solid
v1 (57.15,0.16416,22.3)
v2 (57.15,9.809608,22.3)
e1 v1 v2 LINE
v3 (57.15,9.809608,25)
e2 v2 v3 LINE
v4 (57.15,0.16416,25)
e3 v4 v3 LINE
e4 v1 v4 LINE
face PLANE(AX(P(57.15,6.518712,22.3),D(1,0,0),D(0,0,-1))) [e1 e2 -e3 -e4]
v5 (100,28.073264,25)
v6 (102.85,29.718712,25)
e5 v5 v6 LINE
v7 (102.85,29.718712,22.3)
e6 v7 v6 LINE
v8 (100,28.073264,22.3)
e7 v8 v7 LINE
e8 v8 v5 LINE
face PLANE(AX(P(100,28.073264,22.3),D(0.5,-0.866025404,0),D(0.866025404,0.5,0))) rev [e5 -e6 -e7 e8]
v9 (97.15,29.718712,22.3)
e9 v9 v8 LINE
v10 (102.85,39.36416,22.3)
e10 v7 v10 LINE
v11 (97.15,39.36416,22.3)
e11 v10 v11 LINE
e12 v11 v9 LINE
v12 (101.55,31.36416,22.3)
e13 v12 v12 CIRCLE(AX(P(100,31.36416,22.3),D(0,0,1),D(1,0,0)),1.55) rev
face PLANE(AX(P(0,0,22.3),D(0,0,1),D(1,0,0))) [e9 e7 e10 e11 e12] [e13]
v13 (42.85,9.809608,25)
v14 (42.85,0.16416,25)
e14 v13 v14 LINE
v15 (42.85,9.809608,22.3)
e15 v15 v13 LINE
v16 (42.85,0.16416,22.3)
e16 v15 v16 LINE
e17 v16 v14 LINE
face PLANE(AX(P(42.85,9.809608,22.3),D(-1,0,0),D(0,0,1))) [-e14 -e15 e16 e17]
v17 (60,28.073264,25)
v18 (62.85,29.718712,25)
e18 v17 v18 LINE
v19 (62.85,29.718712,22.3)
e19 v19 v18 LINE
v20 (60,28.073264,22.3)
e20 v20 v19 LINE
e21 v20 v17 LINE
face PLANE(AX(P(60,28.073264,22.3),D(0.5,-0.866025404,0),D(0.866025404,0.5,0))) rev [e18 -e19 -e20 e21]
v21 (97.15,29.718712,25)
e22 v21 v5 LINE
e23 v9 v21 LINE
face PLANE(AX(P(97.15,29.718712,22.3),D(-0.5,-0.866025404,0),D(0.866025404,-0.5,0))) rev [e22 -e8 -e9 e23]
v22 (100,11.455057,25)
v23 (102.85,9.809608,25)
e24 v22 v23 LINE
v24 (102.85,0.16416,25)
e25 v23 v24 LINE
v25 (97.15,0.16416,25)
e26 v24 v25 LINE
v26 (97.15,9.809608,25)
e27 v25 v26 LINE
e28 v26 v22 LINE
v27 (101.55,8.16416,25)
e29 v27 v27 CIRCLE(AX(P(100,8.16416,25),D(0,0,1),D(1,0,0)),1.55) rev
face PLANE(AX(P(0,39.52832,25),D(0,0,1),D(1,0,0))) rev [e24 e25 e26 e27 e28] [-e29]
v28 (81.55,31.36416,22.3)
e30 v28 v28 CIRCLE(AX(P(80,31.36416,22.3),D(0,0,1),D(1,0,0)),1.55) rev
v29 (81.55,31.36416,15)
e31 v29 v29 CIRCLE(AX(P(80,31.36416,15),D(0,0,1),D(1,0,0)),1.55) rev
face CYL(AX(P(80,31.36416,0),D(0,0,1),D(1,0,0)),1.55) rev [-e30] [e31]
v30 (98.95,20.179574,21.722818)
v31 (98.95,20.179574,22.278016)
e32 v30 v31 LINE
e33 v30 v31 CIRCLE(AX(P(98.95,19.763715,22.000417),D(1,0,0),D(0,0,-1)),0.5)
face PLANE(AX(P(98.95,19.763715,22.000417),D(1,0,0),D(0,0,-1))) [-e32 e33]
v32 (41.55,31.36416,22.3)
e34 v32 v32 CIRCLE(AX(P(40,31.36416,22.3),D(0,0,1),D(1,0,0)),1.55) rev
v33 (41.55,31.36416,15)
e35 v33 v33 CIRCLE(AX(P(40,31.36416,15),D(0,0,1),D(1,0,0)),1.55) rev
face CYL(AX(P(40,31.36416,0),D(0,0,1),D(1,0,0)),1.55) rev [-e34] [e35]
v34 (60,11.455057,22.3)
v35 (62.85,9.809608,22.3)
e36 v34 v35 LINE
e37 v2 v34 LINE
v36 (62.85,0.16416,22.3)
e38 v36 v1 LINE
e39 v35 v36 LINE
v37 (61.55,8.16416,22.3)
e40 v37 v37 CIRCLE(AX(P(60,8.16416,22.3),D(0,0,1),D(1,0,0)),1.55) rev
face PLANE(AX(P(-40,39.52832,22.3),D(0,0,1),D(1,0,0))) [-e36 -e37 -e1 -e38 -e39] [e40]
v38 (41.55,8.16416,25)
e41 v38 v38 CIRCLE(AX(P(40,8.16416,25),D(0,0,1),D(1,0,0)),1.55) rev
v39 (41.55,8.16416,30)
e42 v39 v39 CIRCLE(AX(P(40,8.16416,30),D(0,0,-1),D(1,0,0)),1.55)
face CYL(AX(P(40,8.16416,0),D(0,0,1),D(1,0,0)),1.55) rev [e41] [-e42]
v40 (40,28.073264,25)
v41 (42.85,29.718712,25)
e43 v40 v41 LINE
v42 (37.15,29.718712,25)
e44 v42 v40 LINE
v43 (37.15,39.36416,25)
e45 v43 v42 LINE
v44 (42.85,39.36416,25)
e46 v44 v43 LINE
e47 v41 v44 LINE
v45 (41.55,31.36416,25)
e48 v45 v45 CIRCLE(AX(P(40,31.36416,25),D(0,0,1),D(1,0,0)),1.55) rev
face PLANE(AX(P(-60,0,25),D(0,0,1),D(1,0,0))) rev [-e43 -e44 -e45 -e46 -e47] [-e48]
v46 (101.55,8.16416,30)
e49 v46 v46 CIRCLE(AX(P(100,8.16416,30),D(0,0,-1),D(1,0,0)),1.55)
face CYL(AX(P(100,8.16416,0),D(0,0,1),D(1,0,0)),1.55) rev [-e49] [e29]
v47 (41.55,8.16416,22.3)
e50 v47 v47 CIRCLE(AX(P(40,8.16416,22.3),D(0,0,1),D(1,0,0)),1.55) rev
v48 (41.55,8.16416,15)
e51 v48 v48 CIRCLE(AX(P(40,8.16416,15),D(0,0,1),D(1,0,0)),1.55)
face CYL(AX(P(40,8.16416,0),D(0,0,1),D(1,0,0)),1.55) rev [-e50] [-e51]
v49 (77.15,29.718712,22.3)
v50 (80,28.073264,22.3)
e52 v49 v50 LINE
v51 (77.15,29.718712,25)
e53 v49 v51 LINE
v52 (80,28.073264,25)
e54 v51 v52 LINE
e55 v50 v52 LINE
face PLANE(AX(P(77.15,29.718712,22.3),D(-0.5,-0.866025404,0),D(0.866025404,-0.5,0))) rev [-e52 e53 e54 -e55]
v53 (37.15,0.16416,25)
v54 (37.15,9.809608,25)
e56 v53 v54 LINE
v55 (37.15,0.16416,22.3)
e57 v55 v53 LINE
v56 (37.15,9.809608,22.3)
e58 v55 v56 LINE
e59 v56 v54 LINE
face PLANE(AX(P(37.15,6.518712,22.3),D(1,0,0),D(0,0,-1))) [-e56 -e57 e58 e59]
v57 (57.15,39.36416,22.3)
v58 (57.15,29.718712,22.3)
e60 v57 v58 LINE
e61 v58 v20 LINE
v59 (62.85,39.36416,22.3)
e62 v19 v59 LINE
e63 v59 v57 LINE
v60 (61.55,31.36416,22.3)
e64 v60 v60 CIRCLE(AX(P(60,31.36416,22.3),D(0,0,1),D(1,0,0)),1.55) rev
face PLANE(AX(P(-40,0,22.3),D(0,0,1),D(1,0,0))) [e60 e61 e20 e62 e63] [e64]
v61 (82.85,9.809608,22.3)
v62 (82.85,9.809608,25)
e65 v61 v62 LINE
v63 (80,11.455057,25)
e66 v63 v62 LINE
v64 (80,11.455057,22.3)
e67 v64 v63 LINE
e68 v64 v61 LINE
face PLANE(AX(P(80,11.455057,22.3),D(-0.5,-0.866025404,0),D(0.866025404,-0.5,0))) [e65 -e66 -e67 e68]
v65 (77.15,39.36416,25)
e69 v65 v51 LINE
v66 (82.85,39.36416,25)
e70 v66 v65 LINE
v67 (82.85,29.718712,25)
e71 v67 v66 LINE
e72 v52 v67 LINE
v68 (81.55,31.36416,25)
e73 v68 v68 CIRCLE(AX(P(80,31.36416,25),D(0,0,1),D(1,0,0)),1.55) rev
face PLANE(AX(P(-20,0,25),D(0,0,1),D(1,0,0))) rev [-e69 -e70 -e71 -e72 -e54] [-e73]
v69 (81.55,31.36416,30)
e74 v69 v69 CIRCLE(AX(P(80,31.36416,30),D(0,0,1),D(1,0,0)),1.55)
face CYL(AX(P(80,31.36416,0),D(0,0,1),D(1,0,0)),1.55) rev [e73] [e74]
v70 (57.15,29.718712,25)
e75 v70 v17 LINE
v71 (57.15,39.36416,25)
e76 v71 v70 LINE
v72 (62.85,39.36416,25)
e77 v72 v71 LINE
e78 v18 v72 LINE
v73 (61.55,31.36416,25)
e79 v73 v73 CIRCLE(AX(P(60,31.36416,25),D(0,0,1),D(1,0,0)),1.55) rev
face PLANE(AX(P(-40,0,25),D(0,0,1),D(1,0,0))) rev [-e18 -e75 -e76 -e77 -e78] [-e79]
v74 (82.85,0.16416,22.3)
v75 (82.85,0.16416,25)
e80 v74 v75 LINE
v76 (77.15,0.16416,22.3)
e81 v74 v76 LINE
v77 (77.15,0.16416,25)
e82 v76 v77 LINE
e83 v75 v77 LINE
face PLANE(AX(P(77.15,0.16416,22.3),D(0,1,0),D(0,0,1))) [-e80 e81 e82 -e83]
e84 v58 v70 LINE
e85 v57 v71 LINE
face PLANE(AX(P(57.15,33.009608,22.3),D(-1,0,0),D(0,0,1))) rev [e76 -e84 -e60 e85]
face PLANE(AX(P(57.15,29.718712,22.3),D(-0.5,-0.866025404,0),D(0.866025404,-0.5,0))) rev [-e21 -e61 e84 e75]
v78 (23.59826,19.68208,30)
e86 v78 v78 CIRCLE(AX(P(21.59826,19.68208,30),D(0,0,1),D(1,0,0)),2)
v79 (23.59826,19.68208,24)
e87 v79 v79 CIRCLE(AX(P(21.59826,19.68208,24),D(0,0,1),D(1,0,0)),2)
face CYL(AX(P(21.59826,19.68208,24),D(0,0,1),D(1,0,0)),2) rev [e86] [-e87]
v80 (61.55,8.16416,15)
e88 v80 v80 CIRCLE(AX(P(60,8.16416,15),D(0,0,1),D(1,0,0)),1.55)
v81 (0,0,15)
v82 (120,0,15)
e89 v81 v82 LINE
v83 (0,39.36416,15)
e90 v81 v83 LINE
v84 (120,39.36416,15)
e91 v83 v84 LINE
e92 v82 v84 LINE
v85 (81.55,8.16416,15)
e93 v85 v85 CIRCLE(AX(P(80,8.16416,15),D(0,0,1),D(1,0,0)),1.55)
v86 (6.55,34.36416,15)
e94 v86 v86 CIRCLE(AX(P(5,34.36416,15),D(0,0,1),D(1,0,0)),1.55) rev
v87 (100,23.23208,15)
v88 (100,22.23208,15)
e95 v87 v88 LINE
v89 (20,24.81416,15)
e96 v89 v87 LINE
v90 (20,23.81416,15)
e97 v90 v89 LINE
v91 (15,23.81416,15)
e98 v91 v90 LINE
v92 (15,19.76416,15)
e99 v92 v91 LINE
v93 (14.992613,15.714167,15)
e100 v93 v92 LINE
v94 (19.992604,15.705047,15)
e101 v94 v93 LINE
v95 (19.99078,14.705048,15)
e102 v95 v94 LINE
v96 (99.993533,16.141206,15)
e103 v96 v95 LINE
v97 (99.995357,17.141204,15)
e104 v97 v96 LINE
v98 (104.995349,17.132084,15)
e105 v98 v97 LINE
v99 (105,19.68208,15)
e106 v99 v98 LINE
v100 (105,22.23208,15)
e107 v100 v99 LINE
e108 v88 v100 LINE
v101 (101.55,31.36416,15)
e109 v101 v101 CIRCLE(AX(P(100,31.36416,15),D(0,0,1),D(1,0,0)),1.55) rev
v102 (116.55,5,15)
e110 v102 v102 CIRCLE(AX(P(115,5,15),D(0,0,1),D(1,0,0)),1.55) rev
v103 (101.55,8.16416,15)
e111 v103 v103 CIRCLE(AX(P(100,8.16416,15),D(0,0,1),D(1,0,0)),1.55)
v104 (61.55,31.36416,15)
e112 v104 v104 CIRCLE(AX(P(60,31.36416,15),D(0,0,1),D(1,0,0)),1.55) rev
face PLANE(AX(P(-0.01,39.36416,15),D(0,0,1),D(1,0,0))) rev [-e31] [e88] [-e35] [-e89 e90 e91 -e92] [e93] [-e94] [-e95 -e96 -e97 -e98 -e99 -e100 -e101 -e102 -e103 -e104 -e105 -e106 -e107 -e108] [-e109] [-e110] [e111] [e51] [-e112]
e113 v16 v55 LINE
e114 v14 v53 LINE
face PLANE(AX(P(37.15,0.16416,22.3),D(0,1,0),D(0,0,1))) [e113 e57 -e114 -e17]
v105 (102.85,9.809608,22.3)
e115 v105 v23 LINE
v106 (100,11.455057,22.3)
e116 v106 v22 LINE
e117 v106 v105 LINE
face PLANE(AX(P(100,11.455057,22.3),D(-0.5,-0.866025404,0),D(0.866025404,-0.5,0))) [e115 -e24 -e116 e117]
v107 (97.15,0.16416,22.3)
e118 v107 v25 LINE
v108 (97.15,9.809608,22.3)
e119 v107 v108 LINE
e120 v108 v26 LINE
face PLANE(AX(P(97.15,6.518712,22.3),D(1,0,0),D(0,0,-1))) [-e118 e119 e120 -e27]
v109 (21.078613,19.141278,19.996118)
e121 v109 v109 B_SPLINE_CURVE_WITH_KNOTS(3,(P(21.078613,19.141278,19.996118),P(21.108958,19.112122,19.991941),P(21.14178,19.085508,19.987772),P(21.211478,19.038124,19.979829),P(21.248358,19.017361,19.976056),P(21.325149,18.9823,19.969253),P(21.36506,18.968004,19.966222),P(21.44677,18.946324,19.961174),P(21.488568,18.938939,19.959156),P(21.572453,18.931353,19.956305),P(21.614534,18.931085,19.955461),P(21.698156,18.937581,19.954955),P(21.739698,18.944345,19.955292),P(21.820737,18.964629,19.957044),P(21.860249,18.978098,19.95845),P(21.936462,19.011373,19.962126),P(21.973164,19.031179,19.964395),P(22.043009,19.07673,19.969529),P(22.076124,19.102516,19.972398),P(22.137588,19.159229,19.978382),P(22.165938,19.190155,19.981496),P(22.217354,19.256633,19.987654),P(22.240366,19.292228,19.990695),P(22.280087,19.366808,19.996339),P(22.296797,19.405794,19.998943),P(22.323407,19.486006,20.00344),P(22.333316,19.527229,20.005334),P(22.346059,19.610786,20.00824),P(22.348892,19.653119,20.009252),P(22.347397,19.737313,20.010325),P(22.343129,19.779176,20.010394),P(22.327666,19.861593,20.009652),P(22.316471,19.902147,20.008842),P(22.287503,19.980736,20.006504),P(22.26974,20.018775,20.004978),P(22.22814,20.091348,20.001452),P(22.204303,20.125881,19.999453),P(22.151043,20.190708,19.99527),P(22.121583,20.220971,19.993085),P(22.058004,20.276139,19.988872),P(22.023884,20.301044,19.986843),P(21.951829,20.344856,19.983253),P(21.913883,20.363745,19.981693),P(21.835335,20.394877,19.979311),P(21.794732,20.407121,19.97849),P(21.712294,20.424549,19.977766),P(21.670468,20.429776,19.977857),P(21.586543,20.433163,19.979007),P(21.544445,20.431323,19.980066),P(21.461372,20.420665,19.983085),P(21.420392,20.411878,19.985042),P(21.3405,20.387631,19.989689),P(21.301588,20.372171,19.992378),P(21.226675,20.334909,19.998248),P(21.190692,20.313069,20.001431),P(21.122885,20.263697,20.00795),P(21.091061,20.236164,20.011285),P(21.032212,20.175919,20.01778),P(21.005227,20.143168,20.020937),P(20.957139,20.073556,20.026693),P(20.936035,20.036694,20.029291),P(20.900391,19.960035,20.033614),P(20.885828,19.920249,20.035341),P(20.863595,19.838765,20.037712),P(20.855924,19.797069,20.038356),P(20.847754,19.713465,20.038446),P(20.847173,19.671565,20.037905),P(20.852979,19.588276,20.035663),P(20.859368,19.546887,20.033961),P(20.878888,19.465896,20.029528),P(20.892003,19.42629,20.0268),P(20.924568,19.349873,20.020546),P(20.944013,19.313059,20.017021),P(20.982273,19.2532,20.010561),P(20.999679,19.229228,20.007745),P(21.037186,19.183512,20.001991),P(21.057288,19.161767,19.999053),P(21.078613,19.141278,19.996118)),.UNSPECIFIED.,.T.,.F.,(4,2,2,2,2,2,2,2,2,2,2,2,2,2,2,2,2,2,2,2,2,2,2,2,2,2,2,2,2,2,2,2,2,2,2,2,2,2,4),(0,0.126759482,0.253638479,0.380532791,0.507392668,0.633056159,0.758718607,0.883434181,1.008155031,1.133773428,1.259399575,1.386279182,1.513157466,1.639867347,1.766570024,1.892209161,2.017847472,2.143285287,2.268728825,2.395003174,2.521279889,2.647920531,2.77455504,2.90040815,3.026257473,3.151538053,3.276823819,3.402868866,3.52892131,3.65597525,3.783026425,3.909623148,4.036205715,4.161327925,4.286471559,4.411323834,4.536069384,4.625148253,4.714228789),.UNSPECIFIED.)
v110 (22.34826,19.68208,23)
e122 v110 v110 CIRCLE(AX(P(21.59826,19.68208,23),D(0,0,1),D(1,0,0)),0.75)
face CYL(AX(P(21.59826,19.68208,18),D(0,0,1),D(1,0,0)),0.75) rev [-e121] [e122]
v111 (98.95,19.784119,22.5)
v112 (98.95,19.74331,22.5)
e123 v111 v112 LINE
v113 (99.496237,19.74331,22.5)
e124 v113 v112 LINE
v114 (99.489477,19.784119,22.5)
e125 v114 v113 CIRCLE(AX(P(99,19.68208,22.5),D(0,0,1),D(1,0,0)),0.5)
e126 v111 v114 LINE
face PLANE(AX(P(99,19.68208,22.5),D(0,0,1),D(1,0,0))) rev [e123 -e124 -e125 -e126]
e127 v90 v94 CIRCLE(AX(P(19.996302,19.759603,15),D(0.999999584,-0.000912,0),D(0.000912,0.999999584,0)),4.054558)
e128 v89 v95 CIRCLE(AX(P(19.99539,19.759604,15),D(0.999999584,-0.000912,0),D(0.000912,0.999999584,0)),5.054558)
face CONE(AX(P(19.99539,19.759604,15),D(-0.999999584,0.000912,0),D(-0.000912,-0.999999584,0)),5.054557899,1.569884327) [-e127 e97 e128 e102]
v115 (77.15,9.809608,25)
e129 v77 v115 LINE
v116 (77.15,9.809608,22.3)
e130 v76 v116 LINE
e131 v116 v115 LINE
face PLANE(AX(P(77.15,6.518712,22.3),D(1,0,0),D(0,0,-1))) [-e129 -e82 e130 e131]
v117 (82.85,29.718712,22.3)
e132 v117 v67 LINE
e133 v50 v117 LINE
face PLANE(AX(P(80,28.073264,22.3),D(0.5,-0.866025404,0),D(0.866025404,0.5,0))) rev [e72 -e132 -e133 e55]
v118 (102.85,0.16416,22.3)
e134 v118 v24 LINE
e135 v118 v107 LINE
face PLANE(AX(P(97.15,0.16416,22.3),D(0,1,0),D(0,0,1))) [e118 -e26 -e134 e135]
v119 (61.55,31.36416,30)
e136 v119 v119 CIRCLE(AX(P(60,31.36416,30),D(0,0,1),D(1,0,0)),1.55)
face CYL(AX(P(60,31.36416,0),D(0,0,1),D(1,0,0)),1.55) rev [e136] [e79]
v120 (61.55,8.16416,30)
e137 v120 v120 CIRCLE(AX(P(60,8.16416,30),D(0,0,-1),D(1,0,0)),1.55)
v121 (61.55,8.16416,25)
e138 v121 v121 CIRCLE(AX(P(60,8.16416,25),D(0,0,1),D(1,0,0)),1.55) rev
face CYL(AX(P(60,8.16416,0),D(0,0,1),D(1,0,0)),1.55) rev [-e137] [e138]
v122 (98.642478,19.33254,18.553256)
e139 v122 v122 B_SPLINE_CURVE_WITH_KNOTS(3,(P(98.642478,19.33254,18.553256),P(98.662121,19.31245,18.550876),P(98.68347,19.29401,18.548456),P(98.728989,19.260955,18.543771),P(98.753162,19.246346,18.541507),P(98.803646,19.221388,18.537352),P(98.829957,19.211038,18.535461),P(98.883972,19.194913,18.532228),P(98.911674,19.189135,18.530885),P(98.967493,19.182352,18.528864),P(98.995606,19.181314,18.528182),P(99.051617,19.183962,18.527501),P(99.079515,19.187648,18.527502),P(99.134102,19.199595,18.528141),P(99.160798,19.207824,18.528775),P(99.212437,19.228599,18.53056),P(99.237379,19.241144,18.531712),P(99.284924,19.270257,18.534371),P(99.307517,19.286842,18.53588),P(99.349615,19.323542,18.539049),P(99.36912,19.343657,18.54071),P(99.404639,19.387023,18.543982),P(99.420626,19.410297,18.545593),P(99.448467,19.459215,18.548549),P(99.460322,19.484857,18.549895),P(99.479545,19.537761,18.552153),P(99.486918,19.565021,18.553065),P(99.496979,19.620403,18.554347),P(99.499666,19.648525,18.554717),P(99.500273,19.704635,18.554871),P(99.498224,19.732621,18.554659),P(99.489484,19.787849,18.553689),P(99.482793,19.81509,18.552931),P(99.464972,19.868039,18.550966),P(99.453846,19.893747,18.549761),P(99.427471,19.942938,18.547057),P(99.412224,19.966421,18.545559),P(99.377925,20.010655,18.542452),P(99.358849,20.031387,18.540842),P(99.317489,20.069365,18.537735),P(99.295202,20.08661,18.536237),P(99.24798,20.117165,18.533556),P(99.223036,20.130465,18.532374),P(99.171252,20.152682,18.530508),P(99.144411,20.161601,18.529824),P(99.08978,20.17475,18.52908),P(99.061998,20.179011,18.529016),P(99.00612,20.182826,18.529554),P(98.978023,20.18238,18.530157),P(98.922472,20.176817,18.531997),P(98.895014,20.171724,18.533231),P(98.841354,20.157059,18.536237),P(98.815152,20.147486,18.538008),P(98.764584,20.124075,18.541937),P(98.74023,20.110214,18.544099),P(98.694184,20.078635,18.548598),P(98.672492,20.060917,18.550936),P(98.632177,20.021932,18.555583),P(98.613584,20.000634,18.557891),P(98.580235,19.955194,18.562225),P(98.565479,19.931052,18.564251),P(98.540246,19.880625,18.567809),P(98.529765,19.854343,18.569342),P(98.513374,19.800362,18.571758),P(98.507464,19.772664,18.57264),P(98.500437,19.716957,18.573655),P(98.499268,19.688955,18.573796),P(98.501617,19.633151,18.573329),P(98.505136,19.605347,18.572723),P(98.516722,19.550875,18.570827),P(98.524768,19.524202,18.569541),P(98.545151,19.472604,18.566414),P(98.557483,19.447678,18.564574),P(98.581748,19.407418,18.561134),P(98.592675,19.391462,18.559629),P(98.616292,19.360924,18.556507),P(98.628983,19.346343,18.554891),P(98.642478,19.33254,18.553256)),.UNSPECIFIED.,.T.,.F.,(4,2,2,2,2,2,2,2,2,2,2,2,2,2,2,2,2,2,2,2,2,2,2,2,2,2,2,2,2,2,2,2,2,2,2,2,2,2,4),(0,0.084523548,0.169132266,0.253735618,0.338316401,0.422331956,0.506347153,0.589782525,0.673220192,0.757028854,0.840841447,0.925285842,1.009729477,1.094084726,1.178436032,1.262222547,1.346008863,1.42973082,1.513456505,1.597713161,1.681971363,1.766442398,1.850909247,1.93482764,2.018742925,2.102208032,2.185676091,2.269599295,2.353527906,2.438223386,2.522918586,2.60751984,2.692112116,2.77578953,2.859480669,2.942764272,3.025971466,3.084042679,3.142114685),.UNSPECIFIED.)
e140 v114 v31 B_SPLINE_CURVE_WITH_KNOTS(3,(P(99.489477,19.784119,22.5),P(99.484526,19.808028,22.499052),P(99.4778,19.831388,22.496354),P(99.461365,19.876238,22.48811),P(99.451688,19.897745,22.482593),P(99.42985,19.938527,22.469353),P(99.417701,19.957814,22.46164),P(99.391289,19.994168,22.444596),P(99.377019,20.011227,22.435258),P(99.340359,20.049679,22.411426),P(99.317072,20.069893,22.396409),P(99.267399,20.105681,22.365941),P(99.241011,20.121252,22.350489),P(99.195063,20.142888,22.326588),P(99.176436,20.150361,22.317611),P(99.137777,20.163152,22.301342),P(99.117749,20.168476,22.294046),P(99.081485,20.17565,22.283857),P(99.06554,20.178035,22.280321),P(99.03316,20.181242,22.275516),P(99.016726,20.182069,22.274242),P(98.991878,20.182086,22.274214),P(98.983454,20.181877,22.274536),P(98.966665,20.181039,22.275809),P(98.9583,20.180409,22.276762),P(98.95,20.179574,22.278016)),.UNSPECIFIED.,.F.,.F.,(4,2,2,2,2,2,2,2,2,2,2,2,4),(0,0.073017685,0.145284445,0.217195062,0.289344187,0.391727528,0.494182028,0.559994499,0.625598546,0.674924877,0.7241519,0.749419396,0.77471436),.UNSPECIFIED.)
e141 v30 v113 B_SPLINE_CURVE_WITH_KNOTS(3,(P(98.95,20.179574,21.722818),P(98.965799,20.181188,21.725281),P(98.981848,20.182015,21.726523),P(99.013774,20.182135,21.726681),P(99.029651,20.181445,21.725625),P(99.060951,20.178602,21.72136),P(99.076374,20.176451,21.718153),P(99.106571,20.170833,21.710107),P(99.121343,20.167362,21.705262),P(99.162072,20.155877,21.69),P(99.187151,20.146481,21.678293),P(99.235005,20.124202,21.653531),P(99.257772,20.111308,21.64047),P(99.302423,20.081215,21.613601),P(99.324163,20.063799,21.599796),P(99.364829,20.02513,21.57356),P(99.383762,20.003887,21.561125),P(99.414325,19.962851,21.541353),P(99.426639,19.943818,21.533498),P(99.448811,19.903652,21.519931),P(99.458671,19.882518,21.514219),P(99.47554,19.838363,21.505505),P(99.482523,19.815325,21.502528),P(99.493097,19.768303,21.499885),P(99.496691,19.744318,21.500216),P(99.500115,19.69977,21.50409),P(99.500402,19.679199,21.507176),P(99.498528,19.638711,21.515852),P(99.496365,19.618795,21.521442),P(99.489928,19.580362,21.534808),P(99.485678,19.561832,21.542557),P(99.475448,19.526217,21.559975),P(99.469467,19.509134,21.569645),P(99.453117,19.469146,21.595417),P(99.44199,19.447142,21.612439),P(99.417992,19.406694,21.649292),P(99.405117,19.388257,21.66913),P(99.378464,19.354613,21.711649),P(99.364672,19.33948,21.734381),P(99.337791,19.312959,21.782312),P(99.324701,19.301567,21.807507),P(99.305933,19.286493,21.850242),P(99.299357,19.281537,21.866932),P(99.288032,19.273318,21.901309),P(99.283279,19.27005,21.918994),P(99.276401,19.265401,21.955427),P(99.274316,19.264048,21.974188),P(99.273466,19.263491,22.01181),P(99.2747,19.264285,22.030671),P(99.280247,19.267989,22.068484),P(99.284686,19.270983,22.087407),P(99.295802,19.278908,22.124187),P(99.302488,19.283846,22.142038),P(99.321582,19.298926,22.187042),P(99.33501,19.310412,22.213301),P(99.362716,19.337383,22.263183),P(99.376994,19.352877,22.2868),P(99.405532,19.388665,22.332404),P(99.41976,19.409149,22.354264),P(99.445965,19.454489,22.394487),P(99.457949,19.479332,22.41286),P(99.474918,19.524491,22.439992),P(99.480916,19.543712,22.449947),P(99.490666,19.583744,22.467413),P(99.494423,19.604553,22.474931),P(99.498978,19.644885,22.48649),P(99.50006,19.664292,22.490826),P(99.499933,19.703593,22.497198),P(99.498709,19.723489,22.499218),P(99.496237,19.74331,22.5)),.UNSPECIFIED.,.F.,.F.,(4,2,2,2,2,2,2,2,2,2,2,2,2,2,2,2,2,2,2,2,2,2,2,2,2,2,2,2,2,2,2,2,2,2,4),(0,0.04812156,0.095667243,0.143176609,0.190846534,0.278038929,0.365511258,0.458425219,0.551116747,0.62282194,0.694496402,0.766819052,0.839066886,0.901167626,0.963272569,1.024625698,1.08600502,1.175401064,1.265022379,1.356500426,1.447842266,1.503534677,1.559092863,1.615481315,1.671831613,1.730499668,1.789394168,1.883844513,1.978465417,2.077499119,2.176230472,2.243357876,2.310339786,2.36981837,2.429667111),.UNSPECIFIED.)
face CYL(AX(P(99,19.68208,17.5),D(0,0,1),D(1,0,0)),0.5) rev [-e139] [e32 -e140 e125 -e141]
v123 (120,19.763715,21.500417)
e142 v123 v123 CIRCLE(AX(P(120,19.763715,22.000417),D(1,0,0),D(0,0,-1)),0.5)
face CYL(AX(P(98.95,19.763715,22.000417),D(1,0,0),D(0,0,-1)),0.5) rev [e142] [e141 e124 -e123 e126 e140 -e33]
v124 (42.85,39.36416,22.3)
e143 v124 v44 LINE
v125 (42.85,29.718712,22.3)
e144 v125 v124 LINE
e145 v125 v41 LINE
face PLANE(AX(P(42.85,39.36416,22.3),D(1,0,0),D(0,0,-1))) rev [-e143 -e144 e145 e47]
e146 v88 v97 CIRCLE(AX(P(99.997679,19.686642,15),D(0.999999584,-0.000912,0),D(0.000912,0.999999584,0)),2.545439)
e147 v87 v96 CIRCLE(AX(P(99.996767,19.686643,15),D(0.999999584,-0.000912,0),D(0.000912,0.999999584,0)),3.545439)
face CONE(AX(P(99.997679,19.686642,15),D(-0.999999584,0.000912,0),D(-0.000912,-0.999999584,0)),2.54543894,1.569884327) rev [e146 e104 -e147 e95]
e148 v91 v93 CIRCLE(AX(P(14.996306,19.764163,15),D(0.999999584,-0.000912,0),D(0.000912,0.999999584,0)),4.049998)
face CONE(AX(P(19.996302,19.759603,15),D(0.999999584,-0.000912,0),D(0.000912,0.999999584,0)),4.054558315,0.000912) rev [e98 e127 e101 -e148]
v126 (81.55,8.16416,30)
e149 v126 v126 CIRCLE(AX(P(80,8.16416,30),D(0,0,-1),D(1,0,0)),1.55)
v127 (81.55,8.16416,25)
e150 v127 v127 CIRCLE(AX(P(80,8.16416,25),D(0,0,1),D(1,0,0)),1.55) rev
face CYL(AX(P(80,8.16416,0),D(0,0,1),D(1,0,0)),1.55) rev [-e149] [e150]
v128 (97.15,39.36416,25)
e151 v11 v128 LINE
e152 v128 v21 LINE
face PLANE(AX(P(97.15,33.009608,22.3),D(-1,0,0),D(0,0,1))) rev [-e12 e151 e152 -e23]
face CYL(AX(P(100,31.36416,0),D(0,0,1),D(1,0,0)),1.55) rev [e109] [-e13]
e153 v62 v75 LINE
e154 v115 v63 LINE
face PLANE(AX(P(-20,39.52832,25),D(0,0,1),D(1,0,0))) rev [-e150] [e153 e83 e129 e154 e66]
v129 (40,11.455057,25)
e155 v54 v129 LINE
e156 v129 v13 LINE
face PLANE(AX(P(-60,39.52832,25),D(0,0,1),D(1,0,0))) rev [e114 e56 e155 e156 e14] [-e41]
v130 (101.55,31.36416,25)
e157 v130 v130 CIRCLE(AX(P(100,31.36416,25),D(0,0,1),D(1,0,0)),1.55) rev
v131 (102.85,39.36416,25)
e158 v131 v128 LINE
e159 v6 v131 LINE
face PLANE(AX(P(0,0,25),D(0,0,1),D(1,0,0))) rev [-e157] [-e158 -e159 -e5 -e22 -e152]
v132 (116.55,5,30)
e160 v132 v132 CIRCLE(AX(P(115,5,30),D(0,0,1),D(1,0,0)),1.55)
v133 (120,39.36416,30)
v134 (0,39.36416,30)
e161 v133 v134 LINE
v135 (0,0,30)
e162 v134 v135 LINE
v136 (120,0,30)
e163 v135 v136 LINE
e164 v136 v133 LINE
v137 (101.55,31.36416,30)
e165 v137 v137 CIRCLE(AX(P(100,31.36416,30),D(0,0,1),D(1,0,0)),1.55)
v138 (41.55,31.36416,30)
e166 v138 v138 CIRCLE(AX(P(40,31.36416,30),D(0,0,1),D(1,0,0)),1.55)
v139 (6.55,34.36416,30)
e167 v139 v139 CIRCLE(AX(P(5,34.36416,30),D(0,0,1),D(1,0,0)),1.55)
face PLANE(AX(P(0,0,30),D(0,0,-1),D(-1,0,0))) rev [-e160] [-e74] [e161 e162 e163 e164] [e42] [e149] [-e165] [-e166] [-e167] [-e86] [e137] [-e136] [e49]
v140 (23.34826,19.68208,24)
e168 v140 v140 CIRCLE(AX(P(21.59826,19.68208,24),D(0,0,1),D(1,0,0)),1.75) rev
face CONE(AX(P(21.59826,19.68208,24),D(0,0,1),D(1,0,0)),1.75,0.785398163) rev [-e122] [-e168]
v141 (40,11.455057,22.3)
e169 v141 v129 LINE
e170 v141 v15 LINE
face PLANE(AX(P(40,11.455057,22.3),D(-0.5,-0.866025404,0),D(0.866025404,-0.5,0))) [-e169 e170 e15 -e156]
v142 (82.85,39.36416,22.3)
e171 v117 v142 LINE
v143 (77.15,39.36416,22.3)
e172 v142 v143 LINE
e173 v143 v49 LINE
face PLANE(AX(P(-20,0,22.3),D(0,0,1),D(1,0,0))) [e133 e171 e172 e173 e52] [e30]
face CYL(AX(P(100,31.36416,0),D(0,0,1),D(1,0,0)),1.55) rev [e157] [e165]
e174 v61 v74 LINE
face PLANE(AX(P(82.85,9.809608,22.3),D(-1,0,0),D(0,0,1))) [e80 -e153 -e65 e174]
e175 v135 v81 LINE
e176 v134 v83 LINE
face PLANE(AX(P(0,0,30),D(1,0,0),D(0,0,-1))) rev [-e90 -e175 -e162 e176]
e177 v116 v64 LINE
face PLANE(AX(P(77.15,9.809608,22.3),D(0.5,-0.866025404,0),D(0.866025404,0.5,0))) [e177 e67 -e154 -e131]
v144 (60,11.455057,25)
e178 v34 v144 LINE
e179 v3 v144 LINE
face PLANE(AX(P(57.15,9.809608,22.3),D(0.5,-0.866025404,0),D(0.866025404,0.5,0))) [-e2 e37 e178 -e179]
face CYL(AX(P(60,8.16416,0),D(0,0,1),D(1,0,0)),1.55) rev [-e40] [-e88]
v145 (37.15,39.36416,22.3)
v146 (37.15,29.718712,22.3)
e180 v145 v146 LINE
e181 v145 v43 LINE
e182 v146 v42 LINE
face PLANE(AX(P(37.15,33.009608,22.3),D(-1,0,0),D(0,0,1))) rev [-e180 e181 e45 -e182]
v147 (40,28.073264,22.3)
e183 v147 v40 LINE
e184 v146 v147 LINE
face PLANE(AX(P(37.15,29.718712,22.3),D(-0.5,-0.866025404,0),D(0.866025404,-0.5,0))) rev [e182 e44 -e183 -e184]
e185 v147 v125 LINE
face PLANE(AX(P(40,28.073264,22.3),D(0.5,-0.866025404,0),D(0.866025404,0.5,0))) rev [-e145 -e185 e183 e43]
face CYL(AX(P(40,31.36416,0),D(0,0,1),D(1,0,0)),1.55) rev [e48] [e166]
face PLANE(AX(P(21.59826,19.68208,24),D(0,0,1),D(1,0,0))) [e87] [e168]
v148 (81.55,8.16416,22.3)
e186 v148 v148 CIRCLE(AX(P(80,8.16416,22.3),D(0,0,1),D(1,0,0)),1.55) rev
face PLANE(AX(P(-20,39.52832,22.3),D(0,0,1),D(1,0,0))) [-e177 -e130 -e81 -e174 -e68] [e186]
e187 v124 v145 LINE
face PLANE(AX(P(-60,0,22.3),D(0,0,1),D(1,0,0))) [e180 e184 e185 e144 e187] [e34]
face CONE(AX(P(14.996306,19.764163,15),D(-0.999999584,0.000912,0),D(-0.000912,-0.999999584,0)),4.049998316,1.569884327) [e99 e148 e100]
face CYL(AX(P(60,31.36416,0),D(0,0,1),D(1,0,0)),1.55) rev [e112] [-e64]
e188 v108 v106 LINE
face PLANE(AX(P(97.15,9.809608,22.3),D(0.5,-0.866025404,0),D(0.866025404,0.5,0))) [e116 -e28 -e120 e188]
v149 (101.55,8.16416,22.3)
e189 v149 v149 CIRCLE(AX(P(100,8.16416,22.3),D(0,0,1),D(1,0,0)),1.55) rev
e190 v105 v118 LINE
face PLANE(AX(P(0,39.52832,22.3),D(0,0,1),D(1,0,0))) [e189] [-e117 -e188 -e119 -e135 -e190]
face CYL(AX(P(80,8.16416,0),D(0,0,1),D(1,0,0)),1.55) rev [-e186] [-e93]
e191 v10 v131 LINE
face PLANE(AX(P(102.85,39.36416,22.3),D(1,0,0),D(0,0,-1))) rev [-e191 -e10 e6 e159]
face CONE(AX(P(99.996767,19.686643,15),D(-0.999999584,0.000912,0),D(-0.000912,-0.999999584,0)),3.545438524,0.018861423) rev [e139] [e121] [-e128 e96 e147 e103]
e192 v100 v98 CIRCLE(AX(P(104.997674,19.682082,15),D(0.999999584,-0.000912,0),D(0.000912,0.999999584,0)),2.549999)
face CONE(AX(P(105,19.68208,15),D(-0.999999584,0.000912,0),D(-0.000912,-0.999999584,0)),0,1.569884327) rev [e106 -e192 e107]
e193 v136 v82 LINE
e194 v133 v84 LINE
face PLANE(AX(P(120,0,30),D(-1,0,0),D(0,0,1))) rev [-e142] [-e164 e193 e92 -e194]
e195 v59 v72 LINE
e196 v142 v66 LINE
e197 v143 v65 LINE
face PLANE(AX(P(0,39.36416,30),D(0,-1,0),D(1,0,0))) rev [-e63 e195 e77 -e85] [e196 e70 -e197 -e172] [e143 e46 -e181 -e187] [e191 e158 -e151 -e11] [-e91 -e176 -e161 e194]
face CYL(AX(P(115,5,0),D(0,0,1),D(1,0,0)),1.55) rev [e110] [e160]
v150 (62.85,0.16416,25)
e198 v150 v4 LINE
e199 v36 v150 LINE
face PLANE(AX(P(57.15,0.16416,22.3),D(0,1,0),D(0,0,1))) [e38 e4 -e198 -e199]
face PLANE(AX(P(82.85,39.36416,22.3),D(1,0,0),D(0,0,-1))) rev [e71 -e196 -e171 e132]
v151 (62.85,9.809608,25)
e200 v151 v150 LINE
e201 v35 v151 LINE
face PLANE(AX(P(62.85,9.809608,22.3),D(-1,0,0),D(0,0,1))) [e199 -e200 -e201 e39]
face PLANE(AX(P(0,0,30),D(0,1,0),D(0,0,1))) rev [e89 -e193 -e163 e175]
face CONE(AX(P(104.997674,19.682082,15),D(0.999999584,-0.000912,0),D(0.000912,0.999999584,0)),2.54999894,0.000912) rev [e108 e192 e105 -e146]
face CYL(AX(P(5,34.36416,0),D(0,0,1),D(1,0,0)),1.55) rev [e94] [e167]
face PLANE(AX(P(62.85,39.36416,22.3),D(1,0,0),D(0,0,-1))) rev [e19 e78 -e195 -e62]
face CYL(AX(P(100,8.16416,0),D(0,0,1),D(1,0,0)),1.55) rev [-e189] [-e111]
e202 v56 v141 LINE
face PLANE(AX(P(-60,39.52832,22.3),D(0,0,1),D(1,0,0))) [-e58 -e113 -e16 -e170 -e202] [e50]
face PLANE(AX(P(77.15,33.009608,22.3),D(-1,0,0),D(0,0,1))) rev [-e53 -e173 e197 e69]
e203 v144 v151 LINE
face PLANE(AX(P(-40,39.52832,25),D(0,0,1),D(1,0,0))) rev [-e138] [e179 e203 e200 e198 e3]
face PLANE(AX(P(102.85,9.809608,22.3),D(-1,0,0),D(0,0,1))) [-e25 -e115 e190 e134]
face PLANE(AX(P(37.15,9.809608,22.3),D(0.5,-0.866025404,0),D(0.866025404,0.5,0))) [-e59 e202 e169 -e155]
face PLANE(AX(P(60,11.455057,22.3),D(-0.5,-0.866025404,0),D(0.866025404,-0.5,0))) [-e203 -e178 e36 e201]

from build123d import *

# Parameters (mm, degrees)
SKIZZE2_W                        = 120
SKIZZE2_H                        = 39.364160046
AUFSATZ_LINEAR_AUSTRAGEN1_DEPTH  = 30
SKIZZE24_R                       = 1.55
SCHNITT_LINEAR_AUSTRAGEN4_DEPTH  = 130.805766806
SKIZZE46_R                       = 2.85
SCHNITT_LINEAR_AUSTRAGEN15_DEPTH = 10
SCHNITT_LINEAR_START             = -5
SCHNITT_LINEAR_AUSTRAGEN25_DEPTH = 2.7
LINEARES_MUSTER1_COUNT           = 4
LINEARES_MUSTER1_PITCH           = 20
SPIEGELN2_COPY_1_SKETCH_R        = 2.85
SPIEGELN2_COPY_1_DEPTH           = 10
SPIEGELN2_COPY_2_SKETCH_R        = 2.85
SPIEGELN2_COPY_2_DEPTH           = 10
SPIEGELN2_COPY_3_SKETCH_R        = 2.85
SPIEGELN2_COPY_3_DEPTH           = 10
SPIEGELN2_START                  = -5
SPIEGELN2_COPY_4_DEPTH           = 2.7
SPIEGELN2_COPY_5_DEPTH           = 2.7
SPIEGELN2_COPY_6_DEPTH           = 2.7
SKIZZE51_R                       = 1.55
SCHNITT_LINEAR_AUSTRAGEN26_DEPTH = 130.805766806
SKIZZE75_R                       = 0.75
SCHNITT_LINEAR_AUSTRAGEN28_DEPTH = 12
SKIZZE76_R                       = 2
SCHNITT_LINEAR_AUSTRAGEN29_DEPTH = 6
SKIZZE80_R                       = 0.5
SCHNITT_LINEAR_AUSTRAGEN34_DEPTH = 21.05
SCHNITT_LINEAR_START_2           = -7.5
SKIZZE81_R                       = 0.5
SCHNITT_LINEAR_AUSTRAGEN36_DEPTH = 5
FASE1_SIZE                       = 1
ABSPALTEN3_OUTLINE_W             = 120
ABSPALTEN3_OUTLINE_H             = 39.364160046
ABSPALTEN3_OUTLINE_R             = 1.55
ABSPALTEN3_DEPTH                 = 15


# Read off the part's stored shape, not the designer's step: Abspalten3
with BuildPart() as part:
    # Skizze2 → Aufsatz-Linear austragen1 (new body)
    with BuildSketch(Plane.XY):
        with Locations((60, 19.682080023)):
            Rectangle(SKIZZE2_W, SKIZZE2_H)
    extrude(amount=AUFSATZ_LINEAR_AUSTRAGEN1_DEPTH)

    # Skizze24 → Schnitt-Linear austragen4 (cut, through all)
    with BuildSketch(Plane.XY.offset(30)):
        with Locations((40, 31.364160046)):
            Circle(SKIZZE24_R)
        with Locations((60, 31.364160046)):
            Circle(SKIZZE24_R)
        with Locations((80, 31.364160046)):
            Circle(SKIZZE24_R)
        with Locations((100, 31.364160046)):
            Circle(SKIZZE24_R)
    schnitt_linear_austragen4 = extrude(amount=-SCHNITT_LINEAR_AUSTRAGEN4_DEPTH, mode=Mode.SUBTRACT)

    # Skizze46 → Schnitt-Linear austragen15 (cut)
    with BuildSketch(Plane(origin=(0, 0, 0), x_dir=(-1, 0, 0), z_dir=(0, 0, -1))):
        with Locations((-100, 31.364160046)):
            Circle(SKIZZE46_R)
    schnitt_linear_austragen15 = extrude(amount=-SCHNITT_LINEAR_AUSTRAGEN15_DEPTH, mode=Mode.SUBTRACT)

    # Skizze50 → Schnitt-Linear austragen25 (cut)
    with BuildSketch(Plane.XY.offset(30).offset(SCHNITT_LINEAR_START)):
        Polygon((97.15, 33.009608314), (97.15, 39.364160046), (102.85, 39.364160046), (102.85, 33.009608314), (102.85, 29.718711779), (100, 28.073263512), (97.15, 29.718711779), align=None)
    schnitt_linear_austragen25 = extrude(amount=-SCHNITT_LINEAR_AUSTRAGEN25_DEPTH, mode=Mode.SUBTRACT)

    # Lineares Muster1: Schnitt-Linear austragen15, Schnitt-Linear austragen25 ×4
    with Locations(*[(-i * LINEARES_MUSTER1_PITCH, 0, 0) for i in range(1, LINEARES_MUSTER1_COUNT)]):
        add(schnitt_linear_austragen15, mode=Mode.SUBTRACT)
        add(schnitt_linear_austragen25, mode=Mode.SUBTRACT)

    # Spiegeln2: Schnitt-Linear austragen15, Schnitt-Linear austragen25 across plane
    add(schnitt_linear_austragen15.mirror(Plane.ZX.offset(19.764160046)), mode=Mode.SUBTRACT)
    add(schnitt_linear_austragen25.mirror(Plane.ZX.offset(19.764160046)), mode=Mode.SUBTRACT)

    # Spiegeln2 copy 1 sketch → Spiegeln2 copy 1 (cut)
    with BuildSketch(Plane(origin=(-20, 39.528320093, 0), x_dir=(-1, 0, 0), z_dir=(0, 0, -1))):
        with Locations((-100, -31.364160046)):
            Circle(SPIEGELN2_COPY_1_SKETCH_R)
    extrude(amount=-SPIEGELN2_COPY_1_DEPTH, mode=Mode.SUBTRACT)

    # Spiegeln2 copy 2 sketch → Spiegeln2 copy 2 (cut)
    with BuildSketch(Plane(origin=(-40, 39.528320093, 0), x_dir=(-1, 0, 0), z_dir=(0, 0, -1))):
        with Locations((-100, -31.364160046)):
            Circle(SPIEGELN2_COPY_2_SKETCH_R)
    extrude(amount=-SPIEGELN2_COPY_2_DEPTH, mode=Mode.SUBTRACT)

    # Spiegeln2 copy 3 sketch → Spiegeln2 copy 3 (cut)
    with BuildSketch(Plane(origin=(-60, 39.528320093, 0), x_dir=(-1, 0, 0), z_dir=(0, 0, -1))):
        with Locations((-100, -31.364160046)):
            Circle(SPIEGELN2_COPY_3_SKETCH_R)
    extrude(amount=-SPIEGELN2_COPY_3_DEPTH, mode=Mode.SUBTRACT)

    # Spiegeln2 copy 4 sketch → Spiegeln2 copy 4 (cut)
    with BuildSketch(Plane(origin=(-20, 39.528320093, 30), x_dir=(1, 0, 0), z_dir=(0, 0, 1)).offset(SPIEGELN2_START)):
        Polygon((97.15, -33.009608314), (97.15, -39.364160046), (102.85, -39.364160046), (102.85, -33.009608314), (102.85, -29.718711779), (100, -28.073263512), (97.15, -29.718711779), align=None)
    extrude(amount=-SPIEGELN2_COPY_4_DEPTH, mode=Mode.SUBTRACT)

    # Spiegeln2 copy 5 sketch → Spiegeln2 copy 5 (cut)
    with BuildSketch(Plane(origin=(-40, 39.528320093, 30), x_dir=(1, 0, 0), z_dir=(0, 0, 1)).offset(SPIEGELN2_START)):
        Polygon((97.15, -33.009608314), (97.15, -39.364160046), (102.85, -39.364160046), (102.85, -33.009608314), (102.85, -29.718711779), (100, -28.073263512), (97.15, -29.718711779), align=None)
    extrude(amount=-SPIEGELN2_COPY_5_DEPTH, mode=Mode.SUBTRACT)

    # Spiegeln2 copy 6 sketch → Spiegeln2 copy 6 (cut)
    with BuildSketch(Plane(origin=(-60, 39.528320093, 30), x_dir=(1, 0, 0), z_dir=(0, 0, 1)).offset(SPIEGELN2_START)):
        Polygon((97.15, -33.009608314), (97.15, -39.364160046), (102.85, -39.364160046), (102.85, -33.009608314), (102.85, -29.718711779), (100, -28.073263512), (97.15, -29.718711779), align=None)
    extrude(amount=-SPIEGELN2_COPY_6_DEPTH, mode=Mode.SUBTRACT)

    # Spiegeln3: Schnitt-Linear austragen4 across plane
    add(schnitt_linear_austragen4.mirror(Plane.ZX.offset(19.764160046)), mode=Mode.SUBTRACT)

    # Skizze51 → Schnitt-Linear austragen26 (cut, through all)
    with BuildSketch(Plane.XY.offset(30)):
        with Locations((5, 34.364160046)):
            Circle(SKIZZE51_R)
        with Locations((115, 5)):
            Circle(SKIZZE51_R)
    extrude(amount=-SCHNITT_LINEAR_AUSTRAGEN26_DEPTH, mode=Mode.SUBTRACT)

    # Skizze73 → Schnitt-Rotation5 (revolve, cut)
    with BuildSketch(Plane.XY.offset(15)):
        Polygon((15, 19.764160046), (15, 23.814160046), (20, 23.814160046), (20, 24.814160046), (100, 23.232080023), (100, 22.232080023), (105, 22.232080023), (105, 19.682080023), align=None)
    revolve(axis=Axis((105, 19.682080023, 15), (-0.9999995841280241, 0.0009119998787298228, 0)), mode=Mode.SUBTRACT)

    # Skizze75 → Schnitt-Linear austragen28 (cut)
    with BuildSketch(Plane.XY.offset(30)):
        with Locations((21.598259807, 19.682080023)):
            Circle(SKIZZE75_R)
    extrude(amount=-SCHNITT_LINEAR_AUSTRAGEN28_DEPTH, mode=Mode.SUBTRACT)

    # Skizze76 → Schnitt-Linear austragen29 (cut)
    with BuildSketch(Plane.XY.offset(30)):
        with Locations((21.598259807, 19.682080023)):
            Circle(SKIZZE76_R)
    extrude(amount=-SCHNITT_LINEAR_AUSTRAGEN29_DEPTH, mode=Mode.SUBTRACT)

    # Skizze80 → Schnitt-Linear austragen34 (cut)
    with BuildSketch(Plane(origin=(120, 0, 0), x_dir=(0, 0, -1), z_dir=(1, 0, 0))):
        with Locations((-22.000416524, 19.763714623)):
            Circle(SKIZZE80_R)
    schnitt_linear_austragen34 = extrude(amount=-SCHNITT_LINEAR_AUSTRAGEN34_DEPTH, mode=Mode.SUBTRACT)

    # Skizze81 → Schnitt-Linear austragen36 (cut)
    with BuildSketch(Plane.XY.offset(30).offset(SCHNITT_LINEAR_START_2)):
        with Locations(Location((99, 19.682080023, 0), (0, 0, 7.034090001))):
            Circle(SKIZZE81_R)
    schnitt_linear_austragen36 = extrude(amount=-SCHNITT_LINEAR_AUSTRAGEN36_DEPTH, mode=Mode.SUBTRACT)

    # Spiegeln4: Schnitt-Linear austragen34, Schnitt-Linear austragen36 across plane
    add(schnitt_linear_austragen34.mirror(Plane.XY.offset(15)), mode=Mode.SUBTRACT)
    add(schnitt_linear_austragen36.mirror(Plane.XY.offset(15)), mode=Mode.SUBTRACT)

    # Fase1
    fase1_edges = [part.edges().sort_by_distance(p)[0] for p in [
        (20.848259807, 19.682080023, 24),
    ]]
    chamfer(fase1_edges, length=FASE1_SIZE)

    # Abspalten3 outline → Abspalten3 (cut)
    with BuildSketch(Plane.XY):
        with Locations((60, 19.682080023)):
            Rectangle(ABSPALTEN3_OUTLINE_W, ABSPALTEN3_OUTLINE_H)
        with Locations((115, 5)):
            Circle(ABSPALTEN3_OUTLINE_R, mode=Mode.SUBTRACT)
        with Locations((5, 34.364160046)):
            Circle(ABSPALTEN3_OUTLINE_R, mode=Mode.SUBTRACT)
        with Locations((40, 8.164160046)):
            Circle(ABSPALTEN3_OUTLINE_R, mode=Mode.SUBTRACT)
        with Locations((60, 8.164160046)):
            Circle(ABSPALTEN3_OUTLINE_R, mode=Mode.SUBTRACT)
        with Locations((80, 8.164160046)):
            Circle(ABSPALTEN3_OUTLINE_R, mode=Mode.SUBTRACT)
        with Locations((100, 8.164160046)):
            Circle(ABSPALTEN3_OUTLINE_R, mode=Mode.SUBTRACT)
        with Locations((40, 31.364160046)):
            Circle(ABSPALTEN3_OUTLINE_R, mode=Mode.SUBTRACT)
        with Locations((60, 31.364160046)):
            Circle(ABSPALTEN3_OUTLINE_R, mode=Mode.SUBTRACT)
        with Locations((80, 31.364160046)):
            Circle(ABSPALTEN3_OUTLINE_R, mode=Mode.SUBTRACT)
        with Locations((100, 31.364160046)):
            Circle(ABSPALTEN3_OUTLINE_R, mode=Mode.SUBTRACT)
    extrude(amount=ABSPALTEN3_DEPTH, mode=Mode.SUBTRACT)


solid = part.part
